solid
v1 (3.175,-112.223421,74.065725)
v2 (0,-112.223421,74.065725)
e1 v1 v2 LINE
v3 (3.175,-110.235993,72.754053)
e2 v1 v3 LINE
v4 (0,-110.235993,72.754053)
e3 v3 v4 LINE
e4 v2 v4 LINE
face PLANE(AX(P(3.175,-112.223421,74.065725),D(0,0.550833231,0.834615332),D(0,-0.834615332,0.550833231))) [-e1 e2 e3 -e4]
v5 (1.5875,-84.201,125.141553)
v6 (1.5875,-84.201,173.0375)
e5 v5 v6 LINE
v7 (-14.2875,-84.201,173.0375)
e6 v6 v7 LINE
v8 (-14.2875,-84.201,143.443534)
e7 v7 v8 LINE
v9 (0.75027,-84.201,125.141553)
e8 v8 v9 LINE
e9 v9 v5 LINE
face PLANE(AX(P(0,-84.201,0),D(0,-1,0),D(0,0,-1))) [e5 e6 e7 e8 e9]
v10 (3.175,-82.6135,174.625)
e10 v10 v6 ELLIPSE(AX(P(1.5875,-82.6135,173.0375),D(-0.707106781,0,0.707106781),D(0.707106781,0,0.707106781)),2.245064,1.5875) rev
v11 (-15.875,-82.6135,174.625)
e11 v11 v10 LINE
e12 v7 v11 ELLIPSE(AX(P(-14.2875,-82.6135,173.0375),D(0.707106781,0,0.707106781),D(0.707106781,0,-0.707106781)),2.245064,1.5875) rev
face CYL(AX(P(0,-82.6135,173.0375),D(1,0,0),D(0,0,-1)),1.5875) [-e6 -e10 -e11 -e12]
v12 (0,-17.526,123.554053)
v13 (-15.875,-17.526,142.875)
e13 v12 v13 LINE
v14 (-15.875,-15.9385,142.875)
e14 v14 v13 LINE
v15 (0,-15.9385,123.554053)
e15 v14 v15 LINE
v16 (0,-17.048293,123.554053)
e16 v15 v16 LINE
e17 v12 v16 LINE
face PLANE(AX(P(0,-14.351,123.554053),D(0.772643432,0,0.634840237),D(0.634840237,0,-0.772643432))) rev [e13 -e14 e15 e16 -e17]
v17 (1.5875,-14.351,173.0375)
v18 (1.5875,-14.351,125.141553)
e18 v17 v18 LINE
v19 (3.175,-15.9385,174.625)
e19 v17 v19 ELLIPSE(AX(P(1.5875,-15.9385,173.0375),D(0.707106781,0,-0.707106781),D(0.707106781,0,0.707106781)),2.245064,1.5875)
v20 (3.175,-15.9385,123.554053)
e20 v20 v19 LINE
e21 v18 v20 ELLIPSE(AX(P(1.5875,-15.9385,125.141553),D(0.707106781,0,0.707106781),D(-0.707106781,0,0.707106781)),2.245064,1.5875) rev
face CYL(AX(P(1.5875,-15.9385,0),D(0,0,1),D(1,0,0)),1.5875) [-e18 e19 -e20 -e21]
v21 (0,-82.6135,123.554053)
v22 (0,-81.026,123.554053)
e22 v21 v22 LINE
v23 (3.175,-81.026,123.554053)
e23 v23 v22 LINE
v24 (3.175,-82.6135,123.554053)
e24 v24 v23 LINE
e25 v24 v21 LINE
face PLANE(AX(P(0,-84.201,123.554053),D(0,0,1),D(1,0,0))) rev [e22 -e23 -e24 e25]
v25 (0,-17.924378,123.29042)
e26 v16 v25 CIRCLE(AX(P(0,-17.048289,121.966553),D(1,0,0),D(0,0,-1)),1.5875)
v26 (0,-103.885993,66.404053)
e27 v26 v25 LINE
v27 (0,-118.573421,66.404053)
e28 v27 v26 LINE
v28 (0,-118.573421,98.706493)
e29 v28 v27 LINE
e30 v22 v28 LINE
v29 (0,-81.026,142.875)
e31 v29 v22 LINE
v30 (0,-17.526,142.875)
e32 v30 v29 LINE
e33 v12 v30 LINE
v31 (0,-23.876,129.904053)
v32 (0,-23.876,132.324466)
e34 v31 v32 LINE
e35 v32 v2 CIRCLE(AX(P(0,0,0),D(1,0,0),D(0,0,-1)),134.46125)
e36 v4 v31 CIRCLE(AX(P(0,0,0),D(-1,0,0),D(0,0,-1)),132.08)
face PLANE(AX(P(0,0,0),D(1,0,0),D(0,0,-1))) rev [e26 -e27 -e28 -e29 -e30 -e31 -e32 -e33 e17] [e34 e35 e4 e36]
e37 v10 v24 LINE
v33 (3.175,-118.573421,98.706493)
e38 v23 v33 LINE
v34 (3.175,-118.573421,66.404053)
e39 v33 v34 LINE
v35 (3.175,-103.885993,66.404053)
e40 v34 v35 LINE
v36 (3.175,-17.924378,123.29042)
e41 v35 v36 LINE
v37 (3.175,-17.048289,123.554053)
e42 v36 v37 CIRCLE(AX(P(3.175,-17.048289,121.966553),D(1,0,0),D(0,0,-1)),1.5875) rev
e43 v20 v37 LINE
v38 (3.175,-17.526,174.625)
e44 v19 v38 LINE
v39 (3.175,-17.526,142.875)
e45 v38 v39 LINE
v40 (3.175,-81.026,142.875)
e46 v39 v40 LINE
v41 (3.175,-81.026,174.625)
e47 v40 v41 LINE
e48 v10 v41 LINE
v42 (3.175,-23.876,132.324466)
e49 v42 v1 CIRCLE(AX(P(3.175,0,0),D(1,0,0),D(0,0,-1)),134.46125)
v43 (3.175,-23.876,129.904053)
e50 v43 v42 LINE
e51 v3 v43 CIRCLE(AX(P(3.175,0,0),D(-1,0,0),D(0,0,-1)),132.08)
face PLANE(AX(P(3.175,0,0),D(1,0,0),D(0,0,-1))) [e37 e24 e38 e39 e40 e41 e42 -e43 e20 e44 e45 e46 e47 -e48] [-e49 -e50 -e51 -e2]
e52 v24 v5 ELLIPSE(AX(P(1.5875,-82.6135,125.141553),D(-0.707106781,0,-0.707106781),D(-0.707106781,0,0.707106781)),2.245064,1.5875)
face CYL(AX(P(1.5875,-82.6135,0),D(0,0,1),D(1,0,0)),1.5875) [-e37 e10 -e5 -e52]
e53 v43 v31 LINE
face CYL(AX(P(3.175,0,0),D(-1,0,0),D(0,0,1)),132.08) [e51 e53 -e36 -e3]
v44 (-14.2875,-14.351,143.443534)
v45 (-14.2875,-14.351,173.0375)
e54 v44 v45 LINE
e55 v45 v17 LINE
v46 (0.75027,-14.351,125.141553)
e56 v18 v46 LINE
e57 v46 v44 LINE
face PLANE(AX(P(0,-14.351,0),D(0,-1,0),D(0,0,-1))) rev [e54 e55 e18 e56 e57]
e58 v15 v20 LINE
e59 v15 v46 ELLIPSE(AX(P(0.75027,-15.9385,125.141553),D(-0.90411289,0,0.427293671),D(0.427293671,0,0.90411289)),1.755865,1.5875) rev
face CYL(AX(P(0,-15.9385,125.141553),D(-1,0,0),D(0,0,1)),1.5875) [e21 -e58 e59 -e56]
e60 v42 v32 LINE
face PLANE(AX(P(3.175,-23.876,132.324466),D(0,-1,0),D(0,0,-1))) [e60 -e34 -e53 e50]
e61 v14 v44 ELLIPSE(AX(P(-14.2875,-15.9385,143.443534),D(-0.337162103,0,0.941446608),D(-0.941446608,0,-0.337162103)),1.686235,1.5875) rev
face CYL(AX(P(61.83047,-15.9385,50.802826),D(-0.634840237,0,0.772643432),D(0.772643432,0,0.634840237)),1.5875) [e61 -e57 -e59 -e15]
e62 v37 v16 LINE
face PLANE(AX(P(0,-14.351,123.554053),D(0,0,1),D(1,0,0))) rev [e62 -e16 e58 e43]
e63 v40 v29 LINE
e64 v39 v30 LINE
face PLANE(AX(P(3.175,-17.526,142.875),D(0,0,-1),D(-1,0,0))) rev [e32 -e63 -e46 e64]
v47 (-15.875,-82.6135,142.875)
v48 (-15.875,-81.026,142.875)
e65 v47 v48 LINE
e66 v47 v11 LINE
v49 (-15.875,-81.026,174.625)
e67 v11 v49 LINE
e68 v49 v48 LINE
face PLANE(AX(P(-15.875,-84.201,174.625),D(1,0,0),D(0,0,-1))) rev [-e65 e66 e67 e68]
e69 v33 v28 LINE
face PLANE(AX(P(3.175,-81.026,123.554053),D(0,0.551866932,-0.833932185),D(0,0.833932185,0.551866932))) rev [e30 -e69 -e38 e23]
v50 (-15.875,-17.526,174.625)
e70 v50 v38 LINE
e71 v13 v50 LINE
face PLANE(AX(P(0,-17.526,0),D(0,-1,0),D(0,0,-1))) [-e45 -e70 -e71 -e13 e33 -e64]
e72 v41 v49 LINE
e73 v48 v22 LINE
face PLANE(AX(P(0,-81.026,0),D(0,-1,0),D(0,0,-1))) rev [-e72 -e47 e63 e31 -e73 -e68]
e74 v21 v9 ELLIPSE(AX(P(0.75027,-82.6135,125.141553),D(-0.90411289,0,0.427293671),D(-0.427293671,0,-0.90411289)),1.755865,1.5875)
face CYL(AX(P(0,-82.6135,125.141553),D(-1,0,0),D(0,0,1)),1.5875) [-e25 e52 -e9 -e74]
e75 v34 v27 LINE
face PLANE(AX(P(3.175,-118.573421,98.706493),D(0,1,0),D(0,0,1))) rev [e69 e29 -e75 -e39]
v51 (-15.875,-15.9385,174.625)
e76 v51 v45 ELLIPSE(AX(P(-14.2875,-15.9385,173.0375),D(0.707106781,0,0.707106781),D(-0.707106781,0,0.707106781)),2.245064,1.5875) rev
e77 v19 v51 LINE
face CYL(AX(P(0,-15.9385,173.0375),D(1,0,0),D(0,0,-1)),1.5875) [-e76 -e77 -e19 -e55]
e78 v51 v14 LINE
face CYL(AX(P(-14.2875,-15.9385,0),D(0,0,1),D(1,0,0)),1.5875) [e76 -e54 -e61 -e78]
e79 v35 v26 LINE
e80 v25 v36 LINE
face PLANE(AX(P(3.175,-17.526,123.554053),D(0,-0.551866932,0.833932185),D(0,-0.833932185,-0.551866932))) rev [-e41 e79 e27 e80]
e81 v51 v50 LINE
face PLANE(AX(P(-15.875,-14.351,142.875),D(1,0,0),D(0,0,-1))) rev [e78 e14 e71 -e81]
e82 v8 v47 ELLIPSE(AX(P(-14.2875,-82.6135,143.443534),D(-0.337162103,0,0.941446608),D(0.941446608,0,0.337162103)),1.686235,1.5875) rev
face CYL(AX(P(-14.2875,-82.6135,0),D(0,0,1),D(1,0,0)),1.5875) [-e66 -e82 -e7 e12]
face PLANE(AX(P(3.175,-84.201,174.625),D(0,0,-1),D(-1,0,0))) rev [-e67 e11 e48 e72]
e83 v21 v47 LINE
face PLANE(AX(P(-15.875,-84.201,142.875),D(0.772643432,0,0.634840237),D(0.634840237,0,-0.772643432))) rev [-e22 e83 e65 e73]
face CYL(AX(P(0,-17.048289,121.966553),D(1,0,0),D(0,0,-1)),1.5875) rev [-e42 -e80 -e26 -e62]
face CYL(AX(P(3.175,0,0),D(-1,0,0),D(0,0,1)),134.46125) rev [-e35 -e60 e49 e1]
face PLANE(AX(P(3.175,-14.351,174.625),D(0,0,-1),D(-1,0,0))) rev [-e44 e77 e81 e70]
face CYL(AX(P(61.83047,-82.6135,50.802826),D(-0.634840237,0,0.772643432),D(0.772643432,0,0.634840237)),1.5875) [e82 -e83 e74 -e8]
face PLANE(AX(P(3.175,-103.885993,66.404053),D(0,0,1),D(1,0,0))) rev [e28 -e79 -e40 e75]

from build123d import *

# Parameters (mm, degrees)
BOSS_EXTRUDE1_DEPTH = 3.175
BOSS_EXTRUDE2_DEPTH = 3.175
FILLET1_R           = 1.5875
BOSS_EXTRUDE3_DEPTH = 3.175
FILLET2_R           = 1.5875


with BuildPart() as part:
    # Sketch1 → Boss-Extrude1 (new body)
    with BuildSketch(Plane(origin=(0, 0, 0), x_dir=(0, 0, -1), z_dir=(1, 0, 0))):
        Polygon((-123.554053147, -17.526), (-66.404053147, -103.885992991), (-66.404053147, -118.573420749), (-98.706493282, -118.573420749), (-123.554053147, -81.026), (-142.875, -81.026), (-142.875, -17.526), align=None)
        with BuildLine():
            Line((-132.324466277, -23.876), (-129.904053147, -23.876))
            ThreePointArc((-129.904053147, -23.876), (-110.14576301, -72.890584378), (-72.754053147, -110.235992991))
            Line((-72.754053147, -110.235992991), (-74.065724778, -112.223420749))
            ThreePointArc((-74.065724778, -112.223420749), (-112.252146658, -74.022181286), (-132.324466277, -23.876))
        make_face(mode=Mode.SUBTRACT)
    extrude(amount=BOSS_EXTRUDE1_DEPTH)

    # Sketch2 → Boss-Extrude2 (add)
    with BuildSketch(Plane(origin=(0, -17.526, 0), x_dir=(1, 0, 0), z_dir=(0, 1, 0))):
        Polygon((0, -123.554053147), (3.175, -123.554053147), (3.175, -174.625), (-15.875, -174.625), (-15.875, -142.875), align=None)
    extrude(amount=BOSS_EXTRUDE2_DEPTH)

    # Fillet1
    # the kernel refuses this fillet: 1.5875 mm, written as the material it adds along each edge
    with BuildSketch(Plane(origin=(0, -17.526, 123.554053147), x_dir=(0, -0.8339321851132224, -0.5518669319974573), z_dir=(1, 0, 0))) as fillet1_piece_1:
        with BuildLine():
            CenterArc((FILLET1_R * 0.300920032091, FILLET1_R), FILLET1_R, 236.504813186, 33.495186814)
            Line((-FILLET1_R * 0.250946899906, FILLET1_R * 0.166067814887), (0, 0))
            Line((0, 0), (FILLET1_R * 0.300920032091, 0))
        make_face()
    extrude(amount=3.175)
    # the kernel refuses this fillet: 1.5875 mm, written as the material it takes off along each edge
    with BuildSketch(Plane(origin=(-18.394522192, -14.351, 145.941428621), x_dir=(0.7726434320880118, 0, 0.6348402372654539), z_dir=(0.634840237265454, 0, -0.7726434320880119))) as fillet1_2_piece_1:
        with BuildLine():
            CenterArc((FILLET1_R, FILLET1_R), FILLET1_R, 180, 90)
            Line((0, FILLET1_R), (0, 0))
            Line((0, 0), (FILLET1_R, 0))
        make_face()
    extrude(amount=32.943791454, mode=Mode.SUBTRACT)
    with BuildSketch(Plane(origin=(-15.875, -14.351, 178.59375), x_dir=(1, 0, 0), z_dir=(0, 0, -1))) as fillet1_2_piece_2:
        with BuildLine():
            CenterArc((FILLET1_R, FILLET1_R), FILLET1_R, 180, 90)
            Line((0, FILLET1_R), (0, 0))
            Line((0, 0), (FILLET1_R, 0))
        make_face()
    extrude(amount=39.6875, mode=Mode.SUBTRACT)
    with BuildSketch(Plane(origin=(7.14375, -14.351, 174.625), x_dir=(0, -1, 0), z_dir=(-1, 0, 0))) as fillet1_2_piece_3:
        with BuildLine():
            CenterArc((FILLET1_R, -FILLET1_R), FILLET1_R, 90, 90)
            Line((0, -FILLET1_R), (0, 0))
            Line((0, 0), (FILLET1_R, 0))
        make_face()
    extrude(amount=26.9875, mode=Mode.SUBTRACT)
    with BuildSketch(Plane(origin=(3.175, -14.351, 119.585303147), x_dir=(0, -1, 0), z_dir=(0, 0, 1))) as fillet1_2_piece_4:
        with BuildLine():
            CenterArc((FILLET1_R, -FILLET1_R), FILLET1_R, 90, 90)
            Line((0, -FILLET1_R), (0, 0))
            Line((0, 0), (FILLET1_R, 0))
        make_face()
    extrude(amount=59.008446853, mode=Mode.SUBTRACT)
    with BuildSketch(Plane(origin=(-3.96875, -14.351, 123.554053147), x_dir=(0, 0, 1), z_dir=(1, 0, 0))) as fillet1_2_piece_5:
        with BuildLine():
            CenterArc((FILLET1_R, FILLET1_R), FILLET1_R, 180, 90)
            Line((0, FILLET1_R), (0, 0))
            Line((0, 0), (FILLET1_R, 0))
        make_face()
    extrude(amount=11.1125, mode=Mode.SUBTRACT)

    # Sketch4 → Boss-Extrude3 (add)
    with BuildSketch(Plane.XZ.offset(81.026)):
        Polygon((3.175, 123.554053147), (3.175, 174.625), (-15.875, 174.625), (-15.875, 142.875), (0, 123.554053147), align=None)
    extrude(amount=BOSS_EXTRUDE3_DEPTH)

    # Fillet2
    fillet2_edges = [part.edges().sort_by_distance(p)[0] for p in [
        (1.5875, -84.201, 123.554053147),
        (3.175, -84.201, 149.089526573),
        (-6.35, -84.201, 174.625),
        (-15.875, -84.201, 158.75),
        (-7.9375, -84.201, 133.214526573),
    ]]
    fillet(fillet2_edges, radius=FILLET2_R)


solid = part.part
